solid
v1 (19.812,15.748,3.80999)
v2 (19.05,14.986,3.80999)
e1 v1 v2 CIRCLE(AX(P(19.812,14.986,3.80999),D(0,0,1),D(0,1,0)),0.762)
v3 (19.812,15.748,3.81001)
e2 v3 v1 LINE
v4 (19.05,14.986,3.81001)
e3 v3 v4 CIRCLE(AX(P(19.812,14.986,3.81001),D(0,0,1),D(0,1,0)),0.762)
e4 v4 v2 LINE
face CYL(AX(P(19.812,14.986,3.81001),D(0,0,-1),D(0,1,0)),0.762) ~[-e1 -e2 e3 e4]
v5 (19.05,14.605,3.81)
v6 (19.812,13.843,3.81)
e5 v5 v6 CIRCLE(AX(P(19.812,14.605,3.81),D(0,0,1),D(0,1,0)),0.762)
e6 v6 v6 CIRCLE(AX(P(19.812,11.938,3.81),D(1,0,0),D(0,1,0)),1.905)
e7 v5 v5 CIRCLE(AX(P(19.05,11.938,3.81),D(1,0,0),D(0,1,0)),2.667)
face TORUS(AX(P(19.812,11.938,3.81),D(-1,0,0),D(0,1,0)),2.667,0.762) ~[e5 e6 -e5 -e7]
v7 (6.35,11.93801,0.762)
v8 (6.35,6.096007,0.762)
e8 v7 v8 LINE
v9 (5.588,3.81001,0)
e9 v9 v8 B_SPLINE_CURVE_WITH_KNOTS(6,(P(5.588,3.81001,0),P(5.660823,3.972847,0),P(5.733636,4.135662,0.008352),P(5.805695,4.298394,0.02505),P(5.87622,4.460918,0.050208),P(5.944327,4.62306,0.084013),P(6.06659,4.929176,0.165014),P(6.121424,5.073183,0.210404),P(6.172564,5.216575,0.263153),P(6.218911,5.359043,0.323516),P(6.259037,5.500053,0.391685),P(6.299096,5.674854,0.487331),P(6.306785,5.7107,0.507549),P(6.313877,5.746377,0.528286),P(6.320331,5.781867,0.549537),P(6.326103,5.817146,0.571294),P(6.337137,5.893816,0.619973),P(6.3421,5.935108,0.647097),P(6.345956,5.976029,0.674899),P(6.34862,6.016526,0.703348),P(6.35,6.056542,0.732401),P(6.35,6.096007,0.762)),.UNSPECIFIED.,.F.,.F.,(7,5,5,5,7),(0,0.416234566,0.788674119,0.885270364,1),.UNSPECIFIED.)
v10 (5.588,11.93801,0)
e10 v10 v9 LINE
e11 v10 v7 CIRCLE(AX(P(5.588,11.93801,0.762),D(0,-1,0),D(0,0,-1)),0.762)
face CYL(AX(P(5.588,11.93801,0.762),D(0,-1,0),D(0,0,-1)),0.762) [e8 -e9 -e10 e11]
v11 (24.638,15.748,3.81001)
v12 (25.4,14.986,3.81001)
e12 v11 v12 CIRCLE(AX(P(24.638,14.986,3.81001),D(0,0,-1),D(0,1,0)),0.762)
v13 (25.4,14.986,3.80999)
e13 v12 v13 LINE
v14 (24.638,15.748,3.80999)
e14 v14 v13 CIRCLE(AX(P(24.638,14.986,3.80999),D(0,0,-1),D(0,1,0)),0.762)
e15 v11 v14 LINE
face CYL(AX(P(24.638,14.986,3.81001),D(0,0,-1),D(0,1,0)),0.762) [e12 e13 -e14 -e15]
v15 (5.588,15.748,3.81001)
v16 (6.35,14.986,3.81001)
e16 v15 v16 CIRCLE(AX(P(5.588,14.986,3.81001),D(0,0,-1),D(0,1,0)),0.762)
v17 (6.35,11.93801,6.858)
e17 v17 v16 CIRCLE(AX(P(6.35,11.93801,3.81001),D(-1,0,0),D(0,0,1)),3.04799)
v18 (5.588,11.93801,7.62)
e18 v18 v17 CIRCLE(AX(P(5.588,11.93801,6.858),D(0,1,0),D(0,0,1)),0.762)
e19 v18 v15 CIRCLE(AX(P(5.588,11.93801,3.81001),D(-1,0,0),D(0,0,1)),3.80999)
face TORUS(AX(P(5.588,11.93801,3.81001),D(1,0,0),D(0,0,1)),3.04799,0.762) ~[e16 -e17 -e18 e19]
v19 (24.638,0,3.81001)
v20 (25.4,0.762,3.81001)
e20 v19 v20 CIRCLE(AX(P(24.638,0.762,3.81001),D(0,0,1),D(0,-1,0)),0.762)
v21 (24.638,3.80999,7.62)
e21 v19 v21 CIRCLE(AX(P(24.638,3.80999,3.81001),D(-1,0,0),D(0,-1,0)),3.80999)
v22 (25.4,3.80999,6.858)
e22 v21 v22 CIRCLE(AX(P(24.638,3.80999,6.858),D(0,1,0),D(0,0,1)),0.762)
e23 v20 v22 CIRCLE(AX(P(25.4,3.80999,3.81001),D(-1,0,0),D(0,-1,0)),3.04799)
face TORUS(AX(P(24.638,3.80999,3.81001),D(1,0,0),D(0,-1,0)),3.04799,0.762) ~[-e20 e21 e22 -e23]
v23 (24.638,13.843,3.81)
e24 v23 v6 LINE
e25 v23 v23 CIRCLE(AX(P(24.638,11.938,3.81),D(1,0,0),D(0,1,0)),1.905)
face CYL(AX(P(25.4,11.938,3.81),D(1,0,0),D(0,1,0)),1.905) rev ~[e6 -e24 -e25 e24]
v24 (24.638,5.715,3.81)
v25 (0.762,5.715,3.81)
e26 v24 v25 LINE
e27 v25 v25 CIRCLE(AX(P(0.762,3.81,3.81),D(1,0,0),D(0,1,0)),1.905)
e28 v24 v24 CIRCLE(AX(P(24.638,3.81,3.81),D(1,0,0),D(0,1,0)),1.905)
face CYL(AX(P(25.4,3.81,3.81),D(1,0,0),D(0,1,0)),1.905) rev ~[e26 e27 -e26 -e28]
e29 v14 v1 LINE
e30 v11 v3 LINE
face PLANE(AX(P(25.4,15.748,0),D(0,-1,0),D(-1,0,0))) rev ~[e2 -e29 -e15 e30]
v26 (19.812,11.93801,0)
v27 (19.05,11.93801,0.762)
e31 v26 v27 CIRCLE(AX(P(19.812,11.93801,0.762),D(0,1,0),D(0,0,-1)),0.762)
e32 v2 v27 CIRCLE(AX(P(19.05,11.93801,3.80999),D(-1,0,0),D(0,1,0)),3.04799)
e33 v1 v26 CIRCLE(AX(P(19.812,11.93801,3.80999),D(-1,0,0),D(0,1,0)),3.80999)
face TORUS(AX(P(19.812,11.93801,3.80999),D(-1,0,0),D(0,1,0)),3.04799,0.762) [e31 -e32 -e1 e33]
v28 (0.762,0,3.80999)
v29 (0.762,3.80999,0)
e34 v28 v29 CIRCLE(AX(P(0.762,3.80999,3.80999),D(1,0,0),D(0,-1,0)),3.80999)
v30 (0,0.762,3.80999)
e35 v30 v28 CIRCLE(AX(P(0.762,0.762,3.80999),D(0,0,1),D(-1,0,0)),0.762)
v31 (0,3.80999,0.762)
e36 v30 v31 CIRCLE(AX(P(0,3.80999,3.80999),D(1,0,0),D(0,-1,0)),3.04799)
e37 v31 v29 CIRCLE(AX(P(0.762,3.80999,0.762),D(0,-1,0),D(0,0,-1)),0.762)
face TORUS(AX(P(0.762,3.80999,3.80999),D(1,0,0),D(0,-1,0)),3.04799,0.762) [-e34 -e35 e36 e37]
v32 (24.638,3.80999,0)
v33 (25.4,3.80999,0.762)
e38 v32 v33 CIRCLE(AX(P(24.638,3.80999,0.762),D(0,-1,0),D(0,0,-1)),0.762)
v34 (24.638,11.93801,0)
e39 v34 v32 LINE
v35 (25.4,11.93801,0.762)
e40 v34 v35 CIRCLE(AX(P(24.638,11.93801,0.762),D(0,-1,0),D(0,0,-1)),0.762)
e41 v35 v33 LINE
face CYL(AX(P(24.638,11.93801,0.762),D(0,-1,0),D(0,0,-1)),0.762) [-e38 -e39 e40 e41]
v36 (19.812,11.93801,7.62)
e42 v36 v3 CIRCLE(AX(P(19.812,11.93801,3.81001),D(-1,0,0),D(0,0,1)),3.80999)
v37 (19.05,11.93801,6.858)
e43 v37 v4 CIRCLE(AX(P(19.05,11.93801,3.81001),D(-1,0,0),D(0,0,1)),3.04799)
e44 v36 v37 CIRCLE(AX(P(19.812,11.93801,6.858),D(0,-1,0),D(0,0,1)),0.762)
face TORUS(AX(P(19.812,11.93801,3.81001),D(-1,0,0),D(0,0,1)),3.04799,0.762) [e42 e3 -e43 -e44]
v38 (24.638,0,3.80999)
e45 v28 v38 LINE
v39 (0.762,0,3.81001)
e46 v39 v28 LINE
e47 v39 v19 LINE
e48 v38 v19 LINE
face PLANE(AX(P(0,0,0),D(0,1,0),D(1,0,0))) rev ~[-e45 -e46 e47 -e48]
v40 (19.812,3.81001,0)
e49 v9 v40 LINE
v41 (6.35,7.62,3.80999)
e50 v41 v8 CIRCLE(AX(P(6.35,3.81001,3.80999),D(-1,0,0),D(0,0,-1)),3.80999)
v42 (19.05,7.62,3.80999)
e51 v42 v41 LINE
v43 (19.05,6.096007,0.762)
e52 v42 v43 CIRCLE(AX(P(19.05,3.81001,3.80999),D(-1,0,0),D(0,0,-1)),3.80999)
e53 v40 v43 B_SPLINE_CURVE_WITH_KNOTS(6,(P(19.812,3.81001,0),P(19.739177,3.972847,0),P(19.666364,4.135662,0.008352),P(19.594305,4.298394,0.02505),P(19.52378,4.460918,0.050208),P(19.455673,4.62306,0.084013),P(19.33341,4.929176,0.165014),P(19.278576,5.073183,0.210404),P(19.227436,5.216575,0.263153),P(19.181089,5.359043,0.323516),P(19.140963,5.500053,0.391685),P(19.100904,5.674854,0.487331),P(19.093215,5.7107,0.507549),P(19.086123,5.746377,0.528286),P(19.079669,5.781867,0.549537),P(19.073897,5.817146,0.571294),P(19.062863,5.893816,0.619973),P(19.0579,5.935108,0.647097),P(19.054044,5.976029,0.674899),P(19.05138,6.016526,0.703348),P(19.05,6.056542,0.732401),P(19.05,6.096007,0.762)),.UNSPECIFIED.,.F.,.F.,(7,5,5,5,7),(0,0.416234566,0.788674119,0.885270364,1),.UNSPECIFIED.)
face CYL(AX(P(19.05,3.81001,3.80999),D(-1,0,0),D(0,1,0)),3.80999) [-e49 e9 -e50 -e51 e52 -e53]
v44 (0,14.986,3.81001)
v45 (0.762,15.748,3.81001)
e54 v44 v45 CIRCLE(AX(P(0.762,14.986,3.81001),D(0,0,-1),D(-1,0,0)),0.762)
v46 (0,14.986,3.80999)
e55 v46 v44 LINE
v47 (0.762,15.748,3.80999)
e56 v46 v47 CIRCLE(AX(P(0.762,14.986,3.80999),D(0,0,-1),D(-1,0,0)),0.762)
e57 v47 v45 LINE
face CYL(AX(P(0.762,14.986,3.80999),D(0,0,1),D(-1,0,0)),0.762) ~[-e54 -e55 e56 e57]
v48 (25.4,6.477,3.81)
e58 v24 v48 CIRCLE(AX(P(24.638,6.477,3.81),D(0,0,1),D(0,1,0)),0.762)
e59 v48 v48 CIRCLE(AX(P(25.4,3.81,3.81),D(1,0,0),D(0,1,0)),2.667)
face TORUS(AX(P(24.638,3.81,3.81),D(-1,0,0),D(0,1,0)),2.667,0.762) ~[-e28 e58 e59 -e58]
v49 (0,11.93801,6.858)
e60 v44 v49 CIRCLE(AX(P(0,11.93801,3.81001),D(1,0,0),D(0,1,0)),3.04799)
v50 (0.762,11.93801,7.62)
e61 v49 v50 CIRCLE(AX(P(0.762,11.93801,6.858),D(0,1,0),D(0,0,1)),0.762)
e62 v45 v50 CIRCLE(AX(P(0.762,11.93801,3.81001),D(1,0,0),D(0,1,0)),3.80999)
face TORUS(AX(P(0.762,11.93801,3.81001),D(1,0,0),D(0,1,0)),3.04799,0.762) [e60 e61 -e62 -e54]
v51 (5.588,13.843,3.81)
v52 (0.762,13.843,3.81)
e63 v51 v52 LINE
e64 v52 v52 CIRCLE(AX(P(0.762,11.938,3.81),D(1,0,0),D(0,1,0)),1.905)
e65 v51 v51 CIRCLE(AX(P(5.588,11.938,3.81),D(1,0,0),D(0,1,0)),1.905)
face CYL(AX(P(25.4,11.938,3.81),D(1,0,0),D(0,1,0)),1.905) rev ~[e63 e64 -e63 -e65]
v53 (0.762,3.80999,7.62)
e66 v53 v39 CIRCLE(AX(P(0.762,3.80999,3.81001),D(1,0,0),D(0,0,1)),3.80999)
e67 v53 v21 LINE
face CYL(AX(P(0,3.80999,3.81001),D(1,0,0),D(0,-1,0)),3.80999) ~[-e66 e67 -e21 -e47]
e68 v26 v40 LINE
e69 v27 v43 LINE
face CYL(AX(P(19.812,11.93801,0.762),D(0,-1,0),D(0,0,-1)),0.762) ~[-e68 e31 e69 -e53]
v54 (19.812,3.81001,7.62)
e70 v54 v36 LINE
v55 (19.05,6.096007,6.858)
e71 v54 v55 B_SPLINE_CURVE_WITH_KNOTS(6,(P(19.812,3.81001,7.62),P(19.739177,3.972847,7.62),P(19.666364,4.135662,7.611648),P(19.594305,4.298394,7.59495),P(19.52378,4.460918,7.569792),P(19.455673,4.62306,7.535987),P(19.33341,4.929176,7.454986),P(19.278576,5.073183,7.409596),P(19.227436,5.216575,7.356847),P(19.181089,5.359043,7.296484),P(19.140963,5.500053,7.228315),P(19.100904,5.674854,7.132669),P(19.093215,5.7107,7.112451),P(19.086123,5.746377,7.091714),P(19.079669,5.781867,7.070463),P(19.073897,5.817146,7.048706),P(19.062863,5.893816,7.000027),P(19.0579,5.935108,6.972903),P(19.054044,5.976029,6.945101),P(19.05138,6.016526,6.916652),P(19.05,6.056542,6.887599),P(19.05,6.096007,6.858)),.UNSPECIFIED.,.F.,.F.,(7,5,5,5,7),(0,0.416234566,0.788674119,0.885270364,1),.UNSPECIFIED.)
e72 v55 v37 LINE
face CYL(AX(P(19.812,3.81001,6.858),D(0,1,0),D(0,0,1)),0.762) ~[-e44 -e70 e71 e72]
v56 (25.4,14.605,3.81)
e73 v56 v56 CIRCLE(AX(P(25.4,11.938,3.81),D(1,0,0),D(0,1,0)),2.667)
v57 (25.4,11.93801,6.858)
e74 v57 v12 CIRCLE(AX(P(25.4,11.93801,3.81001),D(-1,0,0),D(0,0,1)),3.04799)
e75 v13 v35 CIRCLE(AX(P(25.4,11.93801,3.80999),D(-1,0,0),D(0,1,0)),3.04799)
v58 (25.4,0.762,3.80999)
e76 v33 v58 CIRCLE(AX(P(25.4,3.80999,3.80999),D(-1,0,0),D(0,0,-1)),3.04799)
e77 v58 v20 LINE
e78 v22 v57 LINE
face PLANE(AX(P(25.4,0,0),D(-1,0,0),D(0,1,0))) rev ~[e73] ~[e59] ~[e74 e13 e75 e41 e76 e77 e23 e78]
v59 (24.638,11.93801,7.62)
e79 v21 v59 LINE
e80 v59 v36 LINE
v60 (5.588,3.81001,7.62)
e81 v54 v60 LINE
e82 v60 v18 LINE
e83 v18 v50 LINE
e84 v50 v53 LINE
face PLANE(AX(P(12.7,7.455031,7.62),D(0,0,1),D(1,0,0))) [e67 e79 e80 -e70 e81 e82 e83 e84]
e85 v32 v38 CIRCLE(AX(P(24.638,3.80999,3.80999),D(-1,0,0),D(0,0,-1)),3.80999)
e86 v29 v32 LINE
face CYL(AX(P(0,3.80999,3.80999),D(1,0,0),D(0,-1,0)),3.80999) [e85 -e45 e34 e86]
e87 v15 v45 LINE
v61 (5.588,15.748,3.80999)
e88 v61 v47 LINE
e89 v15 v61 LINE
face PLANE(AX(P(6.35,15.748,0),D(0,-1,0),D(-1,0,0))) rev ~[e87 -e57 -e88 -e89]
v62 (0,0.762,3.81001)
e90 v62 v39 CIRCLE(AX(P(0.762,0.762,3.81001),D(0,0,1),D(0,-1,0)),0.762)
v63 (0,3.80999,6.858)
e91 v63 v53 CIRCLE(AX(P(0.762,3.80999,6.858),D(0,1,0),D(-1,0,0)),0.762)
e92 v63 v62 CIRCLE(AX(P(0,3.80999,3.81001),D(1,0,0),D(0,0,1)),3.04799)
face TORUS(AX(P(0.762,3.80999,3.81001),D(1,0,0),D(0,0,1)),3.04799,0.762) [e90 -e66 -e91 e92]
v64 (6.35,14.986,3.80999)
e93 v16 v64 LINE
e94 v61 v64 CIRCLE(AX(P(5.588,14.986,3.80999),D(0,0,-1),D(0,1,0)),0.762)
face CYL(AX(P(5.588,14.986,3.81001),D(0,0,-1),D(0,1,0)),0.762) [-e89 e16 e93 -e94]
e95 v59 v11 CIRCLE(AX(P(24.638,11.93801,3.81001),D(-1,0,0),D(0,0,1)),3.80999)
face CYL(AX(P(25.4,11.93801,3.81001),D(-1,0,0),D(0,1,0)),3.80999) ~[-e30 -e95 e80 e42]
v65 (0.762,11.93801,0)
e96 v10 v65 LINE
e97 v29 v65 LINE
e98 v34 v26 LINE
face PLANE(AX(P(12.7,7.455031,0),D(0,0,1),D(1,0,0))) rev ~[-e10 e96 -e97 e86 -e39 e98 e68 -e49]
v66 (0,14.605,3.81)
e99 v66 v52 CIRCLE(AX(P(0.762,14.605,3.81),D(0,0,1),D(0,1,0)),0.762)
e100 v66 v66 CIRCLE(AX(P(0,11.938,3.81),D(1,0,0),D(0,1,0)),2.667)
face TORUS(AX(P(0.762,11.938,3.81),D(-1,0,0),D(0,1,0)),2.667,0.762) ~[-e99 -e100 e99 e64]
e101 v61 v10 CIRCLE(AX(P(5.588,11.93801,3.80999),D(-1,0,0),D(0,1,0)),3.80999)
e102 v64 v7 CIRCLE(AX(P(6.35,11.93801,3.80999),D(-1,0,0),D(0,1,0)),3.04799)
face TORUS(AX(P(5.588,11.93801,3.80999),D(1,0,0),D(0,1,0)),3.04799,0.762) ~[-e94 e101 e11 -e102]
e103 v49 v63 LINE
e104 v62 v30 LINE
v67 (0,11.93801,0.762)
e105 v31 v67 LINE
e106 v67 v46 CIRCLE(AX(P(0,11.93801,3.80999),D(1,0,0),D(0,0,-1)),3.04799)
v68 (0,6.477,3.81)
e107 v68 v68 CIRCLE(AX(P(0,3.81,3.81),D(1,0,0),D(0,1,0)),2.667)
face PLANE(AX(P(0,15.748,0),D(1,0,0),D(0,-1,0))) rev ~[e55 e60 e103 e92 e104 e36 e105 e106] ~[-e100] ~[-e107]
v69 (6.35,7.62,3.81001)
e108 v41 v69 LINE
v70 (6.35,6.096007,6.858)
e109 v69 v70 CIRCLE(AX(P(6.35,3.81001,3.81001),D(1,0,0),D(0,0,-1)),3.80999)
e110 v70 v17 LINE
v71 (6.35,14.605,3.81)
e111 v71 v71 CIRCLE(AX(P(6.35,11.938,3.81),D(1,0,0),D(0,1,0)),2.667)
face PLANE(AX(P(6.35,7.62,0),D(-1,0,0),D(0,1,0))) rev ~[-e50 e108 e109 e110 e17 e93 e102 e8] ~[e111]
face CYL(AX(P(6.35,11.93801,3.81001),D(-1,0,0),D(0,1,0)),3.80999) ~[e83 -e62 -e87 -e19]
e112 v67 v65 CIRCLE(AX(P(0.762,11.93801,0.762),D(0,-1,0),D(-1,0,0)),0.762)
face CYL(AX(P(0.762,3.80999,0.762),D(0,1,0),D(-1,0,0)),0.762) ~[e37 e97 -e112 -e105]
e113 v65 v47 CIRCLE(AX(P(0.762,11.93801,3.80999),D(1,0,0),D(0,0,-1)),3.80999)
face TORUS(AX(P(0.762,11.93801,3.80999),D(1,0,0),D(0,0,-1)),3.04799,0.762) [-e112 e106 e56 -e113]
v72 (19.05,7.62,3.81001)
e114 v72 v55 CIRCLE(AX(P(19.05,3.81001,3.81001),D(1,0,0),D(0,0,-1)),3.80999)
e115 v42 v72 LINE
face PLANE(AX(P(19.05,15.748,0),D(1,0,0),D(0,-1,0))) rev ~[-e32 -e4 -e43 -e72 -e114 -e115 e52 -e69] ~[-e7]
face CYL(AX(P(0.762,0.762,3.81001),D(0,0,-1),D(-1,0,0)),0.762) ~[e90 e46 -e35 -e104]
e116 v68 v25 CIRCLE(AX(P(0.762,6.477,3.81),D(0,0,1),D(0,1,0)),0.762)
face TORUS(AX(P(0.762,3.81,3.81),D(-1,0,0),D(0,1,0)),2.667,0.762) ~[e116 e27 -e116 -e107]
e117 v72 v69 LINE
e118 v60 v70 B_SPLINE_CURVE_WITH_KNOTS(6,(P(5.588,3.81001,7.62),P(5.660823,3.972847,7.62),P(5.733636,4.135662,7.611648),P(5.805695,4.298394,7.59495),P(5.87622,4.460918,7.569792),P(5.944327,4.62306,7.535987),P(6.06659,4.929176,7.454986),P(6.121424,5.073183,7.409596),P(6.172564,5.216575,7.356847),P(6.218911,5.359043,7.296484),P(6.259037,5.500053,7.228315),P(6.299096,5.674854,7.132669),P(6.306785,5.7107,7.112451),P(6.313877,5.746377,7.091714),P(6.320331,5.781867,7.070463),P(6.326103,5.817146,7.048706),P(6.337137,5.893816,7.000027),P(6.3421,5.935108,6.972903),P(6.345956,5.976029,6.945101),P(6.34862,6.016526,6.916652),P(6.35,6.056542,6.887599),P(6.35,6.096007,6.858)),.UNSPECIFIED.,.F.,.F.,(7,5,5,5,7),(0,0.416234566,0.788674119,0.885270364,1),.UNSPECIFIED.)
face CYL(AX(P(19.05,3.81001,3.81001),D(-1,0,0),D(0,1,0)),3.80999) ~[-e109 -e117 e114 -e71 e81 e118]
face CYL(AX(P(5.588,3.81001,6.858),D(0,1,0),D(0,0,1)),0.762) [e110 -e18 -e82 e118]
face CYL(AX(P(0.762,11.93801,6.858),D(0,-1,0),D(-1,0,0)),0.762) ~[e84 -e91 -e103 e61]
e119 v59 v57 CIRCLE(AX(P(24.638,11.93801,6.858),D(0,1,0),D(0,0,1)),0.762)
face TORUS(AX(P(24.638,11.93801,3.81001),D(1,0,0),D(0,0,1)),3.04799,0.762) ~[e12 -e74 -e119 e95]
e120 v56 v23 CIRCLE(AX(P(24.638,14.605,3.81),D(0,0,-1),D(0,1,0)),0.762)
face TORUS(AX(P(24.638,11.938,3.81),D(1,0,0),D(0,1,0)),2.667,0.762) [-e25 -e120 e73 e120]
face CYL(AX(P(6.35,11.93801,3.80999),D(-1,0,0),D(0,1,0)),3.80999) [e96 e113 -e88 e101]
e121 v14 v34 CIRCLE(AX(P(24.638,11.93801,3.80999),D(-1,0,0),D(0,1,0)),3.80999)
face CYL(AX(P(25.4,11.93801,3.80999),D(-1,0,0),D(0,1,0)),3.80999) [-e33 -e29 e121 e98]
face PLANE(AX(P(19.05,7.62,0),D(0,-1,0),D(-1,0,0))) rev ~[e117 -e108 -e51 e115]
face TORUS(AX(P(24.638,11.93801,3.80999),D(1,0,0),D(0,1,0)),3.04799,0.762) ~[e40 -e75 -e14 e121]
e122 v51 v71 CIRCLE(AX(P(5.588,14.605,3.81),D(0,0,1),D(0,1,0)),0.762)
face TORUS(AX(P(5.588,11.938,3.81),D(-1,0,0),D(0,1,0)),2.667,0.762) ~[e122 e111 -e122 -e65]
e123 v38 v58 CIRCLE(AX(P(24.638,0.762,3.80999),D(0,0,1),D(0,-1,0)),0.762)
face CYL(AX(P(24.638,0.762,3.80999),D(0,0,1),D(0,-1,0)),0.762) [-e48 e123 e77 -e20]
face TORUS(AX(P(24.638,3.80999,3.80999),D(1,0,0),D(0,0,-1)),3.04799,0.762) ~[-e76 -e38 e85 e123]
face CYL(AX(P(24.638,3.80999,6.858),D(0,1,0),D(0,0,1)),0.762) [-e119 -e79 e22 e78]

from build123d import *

# Parameters (mm, degrees)
F1_DEPTH = 7.62
F2_R     = 3.80999
F3_R     = 1.905
F4_DEPTH = 25.4
F5_R     = 0.762


# Not quite as in the source:
# - a fillet or chamfer is up to 0.001 mm smaller than in the source, because OpenCascade refuses the exact size


with BuildPart() as f1:
    # F0 (on Top) → F1 (new body)
    with BuildSketch(Plane.XY):
        Polygon((0, 15.748), (0, 0), (25.4, 0), (25.4, 15.748), (19.05, 15.748), (19.05, 7.62), (6.35, 7.62), (6.35, 15.748), align=None)
    extrude(amount=F1_DEPTH)

    # F2 (radius 3.81 in the source; OpenCascade refuses exactly that, so slightly less here)
    f2_edges = [f1.edges().sort_by_distance(p)[0] for p in [
        (12.7, 0, 7.62),
        (12.7, 0, 0),
        (22.225, 15.748, 7.62),
        (22.225, 15.748, 0),
        (12.7, 7.62, 7.62),
        (12.7, 7.62, 0),
        (3.175, 15.748, 7.62),
        (3.175, 15.748, 0),
    ]]
    fillet(f2_edges, radius=F2_R)

    # F3 (on face) → F4 (cut)
    with BuildSketch(Plane.YZ.offset(25.4)):
        with Locations((3.81, 3.81)):
            Circle(F3_R)
        with Locations((11.938, 3.81)):
            Circle(F3_R)
    extrude(amount=-F4_DEPTH, mode=Mode.SUBTRACT)

    # F5
    f5_edges = [f1.edges().sort_by_distance(p)[0] for p in [
        (25.4, 0, 3.81),
        (25.4, 1.11592, 1.11592),
        (25.4, 1.11592, 6.50408),
        (25.4, 7.874, 0),
        (25.4, 7.874, 7.62),
        (25.4, 14.63208, 1.11592),
        (25.4, 14.63208, 6.50408),
        (25.4, 15.748, 3.81),
        (25.4, 10.033, 3.81),
        (25.4, 1.905, 3.81),
        (0, 15.748, 3.81),
        (0, 14.63208, 1.11592),
        (0, 14.63208, 6.50408),
        (0, 7.874, 0),
        (0, 7.874, 7.62),
        (0, 1.11592, 1.11592),
        (0, 1.11592, 6.50408),
        (0, 0, 3.81),
        (0, 10.033, 3.81),
        (0, 1.905, 3.81),
        (6.35, 14.63208, 1.11592),
        (6.35, 10.033, 3.81),
        (19.05, 10.033, 3.81),
        (19.05, 14.63208, 1.11592),
    ]]
    fillet(f5_edges, radius=F5_R)


solid = f1.part
